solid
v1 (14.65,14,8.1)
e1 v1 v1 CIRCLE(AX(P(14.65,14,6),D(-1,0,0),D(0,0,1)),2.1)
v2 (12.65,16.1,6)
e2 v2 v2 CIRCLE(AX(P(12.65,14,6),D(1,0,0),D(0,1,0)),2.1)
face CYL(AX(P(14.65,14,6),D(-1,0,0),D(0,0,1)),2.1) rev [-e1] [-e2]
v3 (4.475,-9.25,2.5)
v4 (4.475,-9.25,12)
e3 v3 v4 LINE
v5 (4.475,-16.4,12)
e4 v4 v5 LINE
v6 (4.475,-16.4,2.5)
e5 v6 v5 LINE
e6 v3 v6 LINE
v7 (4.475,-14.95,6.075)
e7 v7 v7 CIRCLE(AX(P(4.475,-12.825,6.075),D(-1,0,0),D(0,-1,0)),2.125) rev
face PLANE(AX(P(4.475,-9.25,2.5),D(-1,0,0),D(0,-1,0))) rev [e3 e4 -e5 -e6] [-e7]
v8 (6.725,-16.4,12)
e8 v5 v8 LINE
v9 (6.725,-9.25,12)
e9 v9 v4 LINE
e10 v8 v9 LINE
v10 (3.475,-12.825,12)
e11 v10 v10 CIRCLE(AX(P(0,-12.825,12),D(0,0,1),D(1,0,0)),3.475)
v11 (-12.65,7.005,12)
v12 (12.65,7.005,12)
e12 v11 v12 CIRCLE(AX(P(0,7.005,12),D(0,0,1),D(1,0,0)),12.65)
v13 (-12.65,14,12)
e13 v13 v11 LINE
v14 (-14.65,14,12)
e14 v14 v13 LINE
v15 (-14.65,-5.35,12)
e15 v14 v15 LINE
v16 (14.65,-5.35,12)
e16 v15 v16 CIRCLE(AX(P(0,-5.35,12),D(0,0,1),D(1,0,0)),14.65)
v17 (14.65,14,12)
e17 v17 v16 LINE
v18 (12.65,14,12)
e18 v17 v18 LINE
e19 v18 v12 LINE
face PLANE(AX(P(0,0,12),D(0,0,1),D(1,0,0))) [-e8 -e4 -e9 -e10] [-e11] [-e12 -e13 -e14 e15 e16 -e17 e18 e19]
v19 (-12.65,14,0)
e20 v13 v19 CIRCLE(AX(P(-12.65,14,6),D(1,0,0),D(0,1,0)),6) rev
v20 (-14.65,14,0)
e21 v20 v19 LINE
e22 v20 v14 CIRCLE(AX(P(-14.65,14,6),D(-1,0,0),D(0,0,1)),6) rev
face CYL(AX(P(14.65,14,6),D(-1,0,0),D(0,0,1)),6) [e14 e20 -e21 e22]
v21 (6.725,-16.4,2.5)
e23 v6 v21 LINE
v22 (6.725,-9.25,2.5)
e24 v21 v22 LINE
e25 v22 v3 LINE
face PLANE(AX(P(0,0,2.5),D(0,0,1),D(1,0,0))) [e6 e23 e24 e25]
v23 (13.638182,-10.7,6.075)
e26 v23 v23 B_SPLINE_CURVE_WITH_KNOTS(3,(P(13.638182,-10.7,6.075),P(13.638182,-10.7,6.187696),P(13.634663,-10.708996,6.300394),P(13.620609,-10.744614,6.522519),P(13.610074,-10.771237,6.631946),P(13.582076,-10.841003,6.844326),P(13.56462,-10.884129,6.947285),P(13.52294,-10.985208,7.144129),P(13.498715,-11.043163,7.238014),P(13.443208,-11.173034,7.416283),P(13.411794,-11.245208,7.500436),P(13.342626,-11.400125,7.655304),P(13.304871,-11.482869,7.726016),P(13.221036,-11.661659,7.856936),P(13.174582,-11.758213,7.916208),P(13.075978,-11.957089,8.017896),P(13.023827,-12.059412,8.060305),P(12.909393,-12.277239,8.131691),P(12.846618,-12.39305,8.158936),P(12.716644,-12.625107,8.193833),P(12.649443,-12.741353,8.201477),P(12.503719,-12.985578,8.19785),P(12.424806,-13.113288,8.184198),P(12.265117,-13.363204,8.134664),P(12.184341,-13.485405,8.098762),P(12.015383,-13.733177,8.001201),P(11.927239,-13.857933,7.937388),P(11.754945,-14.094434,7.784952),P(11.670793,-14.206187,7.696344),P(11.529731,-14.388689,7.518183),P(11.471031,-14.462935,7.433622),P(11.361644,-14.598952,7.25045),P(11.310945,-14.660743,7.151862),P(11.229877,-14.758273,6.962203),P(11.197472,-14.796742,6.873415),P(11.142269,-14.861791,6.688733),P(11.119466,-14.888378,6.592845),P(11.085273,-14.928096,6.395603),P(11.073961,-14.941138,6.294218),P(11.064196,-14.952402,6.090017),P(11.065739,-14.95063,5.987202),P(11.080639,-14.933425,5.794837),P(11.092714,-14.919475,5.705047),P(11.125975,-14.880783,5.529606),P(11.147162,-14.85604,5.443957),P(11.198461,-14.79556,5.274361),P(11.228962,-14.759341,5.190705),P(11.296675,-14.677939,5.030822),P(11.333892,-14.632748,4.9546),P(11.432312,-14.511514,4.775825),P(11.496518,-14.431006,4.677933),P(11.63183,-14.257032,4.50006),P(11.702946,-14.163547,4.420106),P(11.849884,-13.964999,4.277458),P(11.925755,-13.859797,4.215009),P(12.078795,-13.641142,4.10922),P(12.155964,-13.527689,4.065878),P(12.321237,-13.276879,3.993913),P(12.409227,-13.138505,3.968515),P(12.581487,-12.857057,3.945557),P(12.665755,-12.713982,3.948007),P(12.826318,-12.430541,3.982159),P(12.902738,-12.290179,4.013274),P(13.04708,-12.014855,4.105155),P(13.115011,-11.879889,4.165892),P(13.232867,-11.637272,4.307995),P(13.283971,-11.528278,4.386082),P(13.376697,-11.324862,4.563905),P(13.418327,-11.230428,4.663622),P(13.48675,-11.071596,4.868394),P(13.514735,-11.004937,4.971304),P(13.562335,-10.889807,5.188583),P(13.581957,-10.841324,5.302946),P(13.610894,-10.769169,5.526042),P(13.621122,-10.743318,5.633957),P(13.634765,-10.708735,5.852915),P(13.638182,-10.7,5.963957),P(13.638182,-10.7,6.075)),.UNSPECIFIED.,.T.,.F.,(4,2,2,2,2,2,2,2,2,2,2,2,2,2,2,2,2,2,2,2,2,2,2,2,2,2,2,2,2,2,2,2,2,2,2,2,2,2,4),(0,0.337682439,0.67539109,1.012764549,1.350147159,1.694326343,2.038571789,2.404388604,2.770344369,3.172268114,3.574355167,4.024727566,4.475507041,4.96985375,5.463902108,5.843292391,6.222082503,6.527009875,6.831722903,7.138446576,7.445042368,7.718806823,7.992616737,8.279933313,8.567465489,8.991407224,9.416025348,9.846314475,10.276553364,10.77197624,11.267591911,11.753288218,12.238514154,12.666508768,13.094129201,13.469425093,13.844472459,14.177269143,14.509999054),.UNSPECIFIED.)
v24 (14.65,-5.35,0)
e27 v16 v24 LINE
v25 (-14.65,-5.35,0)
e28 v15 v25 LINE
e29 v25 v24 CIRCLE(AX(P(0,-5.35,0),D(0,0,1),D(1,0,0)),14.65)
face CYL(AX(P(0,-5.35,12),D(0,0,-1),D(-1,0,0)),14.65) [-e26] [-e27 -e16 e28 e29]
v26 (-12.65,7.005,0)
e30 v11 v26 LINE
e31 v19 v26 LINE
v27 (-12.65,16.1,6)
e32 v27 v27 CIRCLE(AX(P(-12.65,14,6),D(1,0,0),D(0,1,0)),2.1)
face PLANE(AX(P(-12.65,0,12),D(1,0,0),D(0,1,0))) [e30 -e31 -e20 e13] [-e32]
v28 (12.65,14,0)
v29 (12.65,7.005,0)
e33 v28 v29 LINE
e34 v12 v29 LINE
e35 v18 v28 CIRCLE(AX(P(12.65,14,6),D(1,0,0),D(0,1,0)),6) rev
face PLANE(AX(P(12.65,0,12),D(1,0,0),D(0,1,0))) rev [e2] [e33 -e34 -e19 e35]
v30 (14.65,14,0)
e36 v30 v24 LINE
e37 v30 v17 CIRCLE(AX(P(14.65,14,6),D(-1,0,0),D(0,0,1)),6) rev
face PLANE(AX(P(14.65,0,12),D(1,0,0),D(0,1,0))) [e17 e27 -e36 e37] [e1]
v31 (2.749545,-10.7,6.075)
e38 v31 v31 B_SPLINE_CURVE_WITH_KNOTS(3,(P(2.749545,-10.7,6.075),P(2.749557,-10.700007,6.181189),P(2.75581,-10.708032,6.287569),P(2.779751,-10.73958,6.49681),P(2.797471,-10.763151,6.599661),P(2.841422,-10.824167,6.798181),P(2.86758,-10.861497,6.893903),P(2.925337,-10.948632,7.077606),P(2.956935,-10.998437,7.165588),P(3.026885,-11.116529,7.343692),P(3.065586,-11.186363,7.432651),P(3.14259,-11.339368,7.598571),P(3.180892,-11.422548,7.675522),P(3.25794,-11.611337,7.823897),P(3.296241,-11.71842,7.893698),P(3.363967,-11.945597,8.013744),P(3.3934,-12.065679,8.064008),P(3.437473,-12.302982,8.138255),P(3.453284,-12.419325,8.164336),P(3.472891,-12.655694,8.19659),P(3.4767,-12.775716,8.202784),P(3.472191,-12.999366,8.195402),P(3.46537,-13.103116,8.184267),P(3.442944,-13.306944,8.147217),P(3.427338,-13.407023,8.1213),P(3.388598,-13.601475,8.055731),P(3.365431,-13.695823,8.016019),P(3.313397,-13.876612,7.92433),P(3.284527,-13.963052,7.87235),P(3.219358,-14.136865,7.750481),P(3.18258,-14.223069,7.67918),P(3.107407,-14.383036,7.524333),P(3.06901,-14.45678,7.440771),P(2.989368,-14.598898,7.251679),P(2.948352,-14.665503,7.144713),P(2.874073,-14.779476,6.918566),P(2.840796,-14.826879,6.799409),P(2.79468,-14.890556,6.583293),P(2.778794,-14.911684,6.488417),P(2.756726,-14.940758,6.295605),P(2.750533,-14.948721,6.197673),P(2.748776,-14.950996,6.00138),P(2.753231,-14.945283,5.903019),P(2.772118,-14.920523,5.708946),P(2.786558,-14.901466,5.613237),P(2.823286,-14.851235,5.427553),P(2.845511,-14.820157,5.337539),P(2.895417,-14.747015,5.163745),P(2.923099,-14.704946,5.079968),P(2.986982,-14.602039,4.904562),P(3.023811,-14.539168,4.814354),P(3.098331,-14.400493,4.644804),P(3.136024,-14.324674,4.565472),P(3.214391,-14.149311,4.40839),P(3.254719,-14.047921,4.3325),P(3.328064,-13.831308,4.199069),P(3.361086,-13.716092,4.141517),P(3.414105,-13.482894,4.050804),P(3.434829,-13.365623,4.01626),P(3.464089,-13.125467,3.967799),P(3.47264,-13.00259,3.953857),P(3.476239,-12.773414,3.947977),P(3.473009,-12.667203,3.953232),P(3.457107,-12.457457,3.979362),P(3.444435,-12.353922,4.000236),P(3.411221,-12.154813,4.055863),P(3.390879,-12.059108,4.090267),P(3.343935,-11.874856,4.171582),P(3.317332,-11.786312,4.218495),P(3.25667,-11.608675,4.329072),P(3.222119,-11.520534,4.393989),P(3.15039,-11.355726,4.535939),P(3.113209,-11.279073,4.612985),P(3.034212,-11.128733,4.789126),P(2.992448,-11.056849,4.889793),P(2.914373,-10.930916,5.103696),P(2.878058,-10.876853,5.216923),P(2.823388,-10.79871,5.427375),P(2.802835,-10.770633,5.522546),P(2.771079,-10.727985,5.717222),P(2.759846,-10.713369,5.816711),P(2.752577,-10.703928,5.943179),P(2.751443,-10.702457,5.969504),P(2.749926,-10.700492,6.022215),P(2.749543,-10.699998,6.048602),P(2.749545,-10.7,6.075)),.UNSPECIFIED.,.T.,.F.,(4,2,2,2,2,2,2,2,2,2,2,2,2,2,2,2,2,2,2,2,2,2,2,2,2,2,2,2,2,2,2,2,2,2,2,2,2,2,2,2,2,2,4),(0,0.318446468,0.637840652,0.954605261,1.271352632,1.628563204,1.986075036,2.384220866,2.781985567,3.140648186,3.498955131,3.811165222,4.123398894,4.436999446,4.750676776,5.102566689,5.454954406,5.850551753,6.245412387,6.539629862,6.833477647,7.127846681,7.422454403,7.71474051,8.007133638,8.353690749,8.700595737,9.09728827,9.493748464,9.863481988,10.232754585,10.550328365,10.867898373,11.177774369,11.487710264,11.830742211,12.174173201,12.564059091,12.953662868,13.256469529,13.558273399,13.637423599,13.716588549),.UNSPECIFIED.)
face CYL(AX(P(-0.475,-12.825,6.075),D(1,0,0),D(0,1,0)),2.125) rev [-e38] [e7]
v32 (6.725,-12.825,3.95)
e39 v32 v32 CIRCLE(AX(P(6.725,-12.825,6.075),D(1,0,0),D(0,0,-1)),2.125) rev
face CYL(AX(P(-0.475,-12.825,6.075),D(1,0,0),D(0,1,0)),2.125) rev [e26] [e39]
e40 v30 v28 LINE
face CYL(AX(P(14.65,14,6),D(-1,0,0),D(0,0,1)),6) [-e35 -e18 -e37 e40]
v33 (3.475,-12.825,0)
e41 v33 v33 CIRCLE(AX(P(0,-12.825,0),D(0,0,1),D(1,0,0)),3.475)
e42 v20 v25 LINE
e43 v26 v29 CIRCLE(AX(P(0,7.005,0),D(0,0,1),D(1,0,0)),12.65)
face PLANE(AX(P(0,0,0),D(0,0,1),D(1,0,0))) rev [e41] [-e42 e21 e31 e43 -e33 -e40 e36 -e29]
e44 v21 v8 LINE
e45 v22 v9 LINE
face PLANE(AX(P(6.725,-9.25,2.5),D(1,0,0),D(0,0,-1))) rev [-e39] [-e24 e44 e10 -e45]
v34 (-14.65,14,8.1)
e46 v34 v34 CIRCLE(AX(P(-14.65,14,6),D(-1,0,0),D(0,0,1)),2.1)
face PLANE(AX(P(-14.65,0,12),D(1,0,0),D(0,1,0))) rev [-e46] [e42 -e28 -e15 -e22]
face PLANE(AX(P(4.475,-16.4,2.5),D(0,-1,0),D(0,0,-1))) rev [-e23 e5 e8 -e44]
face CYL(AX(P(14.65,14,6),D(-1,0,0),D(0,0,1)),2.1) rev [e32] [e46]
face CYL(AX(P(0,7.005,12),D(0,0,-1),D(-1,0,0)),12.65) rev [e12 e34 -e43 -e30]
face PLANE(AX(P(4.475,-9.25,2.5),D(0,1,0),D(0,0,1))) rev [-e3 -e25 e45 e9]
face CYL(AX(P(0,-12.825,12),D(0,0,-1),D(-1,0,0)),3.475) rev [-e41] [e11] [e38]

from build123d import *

# Parameters (mm, degrees)
SKETCH1_R               = 3.475
BOSS_EXTRUDE1_DEPTH     = 12
CUT_EXTRUDE3_START      = -29.3
CUT_EXTRUDE3_OUTLINE_R  = 2.1
CUT_EXTRUDE3_DEPTH      = 29.3
SKETCH3_W               = 2.25
SKETCH3_H               = 7.15
CUT_EXTRUDE4_DEPTH      = 9.5
CUT_EXTRUDE6_DEPTH      = 7.2
CUT_EXTRUDE6_DEPTH_BACK = 11.2
SKETCH4_R               = 2.125


# Read off the part's stored shape, not the designer's step: Cut-Extrude3
with BuildPart() as part:
    # Sketch1 → Boss-Extrude1 (new body)
    with BuildSketch(Plane.XY):
        with BuildLine():
            Line((-14.65, 20), (-14.65, -5.35))
            ThreePointArc((-14.65, -5.35), (0, -20), (14.65, -5.35))
            Line((14.65, -5.35), (14.65, 20))
            Line((14.65, 20), (12.65, 20))
            Line((12.65, 20), (12.65, 7.005))
            ThreePointArc((12.65, 7.005), (0, -5.645), (-12.65, 7.005))
            Line((-12.65, 7.005), (-12.65, 20))
            Line((-12.65, 20), (-14.65, 20))
        make_face()
        with Locations((0, -12.825)):
            Circle(SKETCH1_R, mode=Mode.SUBTRACT)
    extrude(amount=BOSS_EXTRUDE1_DEPTH)

    # Cut-Extrude3 outline → Cut-Extrude3 (cut)
    with BuildSketch(Plane.ZY.offset(14.65).offset(CUT_EXTRUDE3_START)):
        with BuildLine():
            ThreePointArc((0, 14), (1.757359313, 18.242640687), (6, 20))
            Line((6, 20), (0, 20))
            Line((0, 20), (0, 14))
        make_face()
        with BuildLine():
            ThreePointArc((6, 20), (10.242640687, 18.242640687), (12, 14))
            Line((12, 14), (12, 20))
            Line((12, 20), (6, 20))
        make_face()
        with Locations((6, 14)):
            Circle(CUT_EXTRUDE3_OUTLINE_R)
    extrude(amount=CUT_EXTRUDE3_DEPTH, mode=Mode.SUBTRACT)

    # Sketch3 → Cut-Extrude4 (cut)
    with BuildSketch(Plane.XY.offset(12)):
        with Locations((5.6, -12.825)):
            Rectangle(SKETCH3_W, SKETCH3_H)
    extrude(amount=-CUT_EXTRUDE4_DEPTH, mode=Mode.SUBTRACT)

    # Sketch4 → Cut-Extrude6 (cut, two sides: drawn at the far end of the back side and taken through both)
    with BuildSketch(Plane.ZY.offset(-6.725).offset(-CUT_EXTRUDE6_DEPTH_BACK)):
        with Locations(Location((6.075, -12.825, 0), (0, 0, 90))):
            Circle(SKETCH4_R)
    extrude(amount=CUT_EXTRUDE6_DEPTH + CUT_EXTRUDE6_DEPTH_BACK, mode=Mode.SUBTRACT)


solid = part.part
